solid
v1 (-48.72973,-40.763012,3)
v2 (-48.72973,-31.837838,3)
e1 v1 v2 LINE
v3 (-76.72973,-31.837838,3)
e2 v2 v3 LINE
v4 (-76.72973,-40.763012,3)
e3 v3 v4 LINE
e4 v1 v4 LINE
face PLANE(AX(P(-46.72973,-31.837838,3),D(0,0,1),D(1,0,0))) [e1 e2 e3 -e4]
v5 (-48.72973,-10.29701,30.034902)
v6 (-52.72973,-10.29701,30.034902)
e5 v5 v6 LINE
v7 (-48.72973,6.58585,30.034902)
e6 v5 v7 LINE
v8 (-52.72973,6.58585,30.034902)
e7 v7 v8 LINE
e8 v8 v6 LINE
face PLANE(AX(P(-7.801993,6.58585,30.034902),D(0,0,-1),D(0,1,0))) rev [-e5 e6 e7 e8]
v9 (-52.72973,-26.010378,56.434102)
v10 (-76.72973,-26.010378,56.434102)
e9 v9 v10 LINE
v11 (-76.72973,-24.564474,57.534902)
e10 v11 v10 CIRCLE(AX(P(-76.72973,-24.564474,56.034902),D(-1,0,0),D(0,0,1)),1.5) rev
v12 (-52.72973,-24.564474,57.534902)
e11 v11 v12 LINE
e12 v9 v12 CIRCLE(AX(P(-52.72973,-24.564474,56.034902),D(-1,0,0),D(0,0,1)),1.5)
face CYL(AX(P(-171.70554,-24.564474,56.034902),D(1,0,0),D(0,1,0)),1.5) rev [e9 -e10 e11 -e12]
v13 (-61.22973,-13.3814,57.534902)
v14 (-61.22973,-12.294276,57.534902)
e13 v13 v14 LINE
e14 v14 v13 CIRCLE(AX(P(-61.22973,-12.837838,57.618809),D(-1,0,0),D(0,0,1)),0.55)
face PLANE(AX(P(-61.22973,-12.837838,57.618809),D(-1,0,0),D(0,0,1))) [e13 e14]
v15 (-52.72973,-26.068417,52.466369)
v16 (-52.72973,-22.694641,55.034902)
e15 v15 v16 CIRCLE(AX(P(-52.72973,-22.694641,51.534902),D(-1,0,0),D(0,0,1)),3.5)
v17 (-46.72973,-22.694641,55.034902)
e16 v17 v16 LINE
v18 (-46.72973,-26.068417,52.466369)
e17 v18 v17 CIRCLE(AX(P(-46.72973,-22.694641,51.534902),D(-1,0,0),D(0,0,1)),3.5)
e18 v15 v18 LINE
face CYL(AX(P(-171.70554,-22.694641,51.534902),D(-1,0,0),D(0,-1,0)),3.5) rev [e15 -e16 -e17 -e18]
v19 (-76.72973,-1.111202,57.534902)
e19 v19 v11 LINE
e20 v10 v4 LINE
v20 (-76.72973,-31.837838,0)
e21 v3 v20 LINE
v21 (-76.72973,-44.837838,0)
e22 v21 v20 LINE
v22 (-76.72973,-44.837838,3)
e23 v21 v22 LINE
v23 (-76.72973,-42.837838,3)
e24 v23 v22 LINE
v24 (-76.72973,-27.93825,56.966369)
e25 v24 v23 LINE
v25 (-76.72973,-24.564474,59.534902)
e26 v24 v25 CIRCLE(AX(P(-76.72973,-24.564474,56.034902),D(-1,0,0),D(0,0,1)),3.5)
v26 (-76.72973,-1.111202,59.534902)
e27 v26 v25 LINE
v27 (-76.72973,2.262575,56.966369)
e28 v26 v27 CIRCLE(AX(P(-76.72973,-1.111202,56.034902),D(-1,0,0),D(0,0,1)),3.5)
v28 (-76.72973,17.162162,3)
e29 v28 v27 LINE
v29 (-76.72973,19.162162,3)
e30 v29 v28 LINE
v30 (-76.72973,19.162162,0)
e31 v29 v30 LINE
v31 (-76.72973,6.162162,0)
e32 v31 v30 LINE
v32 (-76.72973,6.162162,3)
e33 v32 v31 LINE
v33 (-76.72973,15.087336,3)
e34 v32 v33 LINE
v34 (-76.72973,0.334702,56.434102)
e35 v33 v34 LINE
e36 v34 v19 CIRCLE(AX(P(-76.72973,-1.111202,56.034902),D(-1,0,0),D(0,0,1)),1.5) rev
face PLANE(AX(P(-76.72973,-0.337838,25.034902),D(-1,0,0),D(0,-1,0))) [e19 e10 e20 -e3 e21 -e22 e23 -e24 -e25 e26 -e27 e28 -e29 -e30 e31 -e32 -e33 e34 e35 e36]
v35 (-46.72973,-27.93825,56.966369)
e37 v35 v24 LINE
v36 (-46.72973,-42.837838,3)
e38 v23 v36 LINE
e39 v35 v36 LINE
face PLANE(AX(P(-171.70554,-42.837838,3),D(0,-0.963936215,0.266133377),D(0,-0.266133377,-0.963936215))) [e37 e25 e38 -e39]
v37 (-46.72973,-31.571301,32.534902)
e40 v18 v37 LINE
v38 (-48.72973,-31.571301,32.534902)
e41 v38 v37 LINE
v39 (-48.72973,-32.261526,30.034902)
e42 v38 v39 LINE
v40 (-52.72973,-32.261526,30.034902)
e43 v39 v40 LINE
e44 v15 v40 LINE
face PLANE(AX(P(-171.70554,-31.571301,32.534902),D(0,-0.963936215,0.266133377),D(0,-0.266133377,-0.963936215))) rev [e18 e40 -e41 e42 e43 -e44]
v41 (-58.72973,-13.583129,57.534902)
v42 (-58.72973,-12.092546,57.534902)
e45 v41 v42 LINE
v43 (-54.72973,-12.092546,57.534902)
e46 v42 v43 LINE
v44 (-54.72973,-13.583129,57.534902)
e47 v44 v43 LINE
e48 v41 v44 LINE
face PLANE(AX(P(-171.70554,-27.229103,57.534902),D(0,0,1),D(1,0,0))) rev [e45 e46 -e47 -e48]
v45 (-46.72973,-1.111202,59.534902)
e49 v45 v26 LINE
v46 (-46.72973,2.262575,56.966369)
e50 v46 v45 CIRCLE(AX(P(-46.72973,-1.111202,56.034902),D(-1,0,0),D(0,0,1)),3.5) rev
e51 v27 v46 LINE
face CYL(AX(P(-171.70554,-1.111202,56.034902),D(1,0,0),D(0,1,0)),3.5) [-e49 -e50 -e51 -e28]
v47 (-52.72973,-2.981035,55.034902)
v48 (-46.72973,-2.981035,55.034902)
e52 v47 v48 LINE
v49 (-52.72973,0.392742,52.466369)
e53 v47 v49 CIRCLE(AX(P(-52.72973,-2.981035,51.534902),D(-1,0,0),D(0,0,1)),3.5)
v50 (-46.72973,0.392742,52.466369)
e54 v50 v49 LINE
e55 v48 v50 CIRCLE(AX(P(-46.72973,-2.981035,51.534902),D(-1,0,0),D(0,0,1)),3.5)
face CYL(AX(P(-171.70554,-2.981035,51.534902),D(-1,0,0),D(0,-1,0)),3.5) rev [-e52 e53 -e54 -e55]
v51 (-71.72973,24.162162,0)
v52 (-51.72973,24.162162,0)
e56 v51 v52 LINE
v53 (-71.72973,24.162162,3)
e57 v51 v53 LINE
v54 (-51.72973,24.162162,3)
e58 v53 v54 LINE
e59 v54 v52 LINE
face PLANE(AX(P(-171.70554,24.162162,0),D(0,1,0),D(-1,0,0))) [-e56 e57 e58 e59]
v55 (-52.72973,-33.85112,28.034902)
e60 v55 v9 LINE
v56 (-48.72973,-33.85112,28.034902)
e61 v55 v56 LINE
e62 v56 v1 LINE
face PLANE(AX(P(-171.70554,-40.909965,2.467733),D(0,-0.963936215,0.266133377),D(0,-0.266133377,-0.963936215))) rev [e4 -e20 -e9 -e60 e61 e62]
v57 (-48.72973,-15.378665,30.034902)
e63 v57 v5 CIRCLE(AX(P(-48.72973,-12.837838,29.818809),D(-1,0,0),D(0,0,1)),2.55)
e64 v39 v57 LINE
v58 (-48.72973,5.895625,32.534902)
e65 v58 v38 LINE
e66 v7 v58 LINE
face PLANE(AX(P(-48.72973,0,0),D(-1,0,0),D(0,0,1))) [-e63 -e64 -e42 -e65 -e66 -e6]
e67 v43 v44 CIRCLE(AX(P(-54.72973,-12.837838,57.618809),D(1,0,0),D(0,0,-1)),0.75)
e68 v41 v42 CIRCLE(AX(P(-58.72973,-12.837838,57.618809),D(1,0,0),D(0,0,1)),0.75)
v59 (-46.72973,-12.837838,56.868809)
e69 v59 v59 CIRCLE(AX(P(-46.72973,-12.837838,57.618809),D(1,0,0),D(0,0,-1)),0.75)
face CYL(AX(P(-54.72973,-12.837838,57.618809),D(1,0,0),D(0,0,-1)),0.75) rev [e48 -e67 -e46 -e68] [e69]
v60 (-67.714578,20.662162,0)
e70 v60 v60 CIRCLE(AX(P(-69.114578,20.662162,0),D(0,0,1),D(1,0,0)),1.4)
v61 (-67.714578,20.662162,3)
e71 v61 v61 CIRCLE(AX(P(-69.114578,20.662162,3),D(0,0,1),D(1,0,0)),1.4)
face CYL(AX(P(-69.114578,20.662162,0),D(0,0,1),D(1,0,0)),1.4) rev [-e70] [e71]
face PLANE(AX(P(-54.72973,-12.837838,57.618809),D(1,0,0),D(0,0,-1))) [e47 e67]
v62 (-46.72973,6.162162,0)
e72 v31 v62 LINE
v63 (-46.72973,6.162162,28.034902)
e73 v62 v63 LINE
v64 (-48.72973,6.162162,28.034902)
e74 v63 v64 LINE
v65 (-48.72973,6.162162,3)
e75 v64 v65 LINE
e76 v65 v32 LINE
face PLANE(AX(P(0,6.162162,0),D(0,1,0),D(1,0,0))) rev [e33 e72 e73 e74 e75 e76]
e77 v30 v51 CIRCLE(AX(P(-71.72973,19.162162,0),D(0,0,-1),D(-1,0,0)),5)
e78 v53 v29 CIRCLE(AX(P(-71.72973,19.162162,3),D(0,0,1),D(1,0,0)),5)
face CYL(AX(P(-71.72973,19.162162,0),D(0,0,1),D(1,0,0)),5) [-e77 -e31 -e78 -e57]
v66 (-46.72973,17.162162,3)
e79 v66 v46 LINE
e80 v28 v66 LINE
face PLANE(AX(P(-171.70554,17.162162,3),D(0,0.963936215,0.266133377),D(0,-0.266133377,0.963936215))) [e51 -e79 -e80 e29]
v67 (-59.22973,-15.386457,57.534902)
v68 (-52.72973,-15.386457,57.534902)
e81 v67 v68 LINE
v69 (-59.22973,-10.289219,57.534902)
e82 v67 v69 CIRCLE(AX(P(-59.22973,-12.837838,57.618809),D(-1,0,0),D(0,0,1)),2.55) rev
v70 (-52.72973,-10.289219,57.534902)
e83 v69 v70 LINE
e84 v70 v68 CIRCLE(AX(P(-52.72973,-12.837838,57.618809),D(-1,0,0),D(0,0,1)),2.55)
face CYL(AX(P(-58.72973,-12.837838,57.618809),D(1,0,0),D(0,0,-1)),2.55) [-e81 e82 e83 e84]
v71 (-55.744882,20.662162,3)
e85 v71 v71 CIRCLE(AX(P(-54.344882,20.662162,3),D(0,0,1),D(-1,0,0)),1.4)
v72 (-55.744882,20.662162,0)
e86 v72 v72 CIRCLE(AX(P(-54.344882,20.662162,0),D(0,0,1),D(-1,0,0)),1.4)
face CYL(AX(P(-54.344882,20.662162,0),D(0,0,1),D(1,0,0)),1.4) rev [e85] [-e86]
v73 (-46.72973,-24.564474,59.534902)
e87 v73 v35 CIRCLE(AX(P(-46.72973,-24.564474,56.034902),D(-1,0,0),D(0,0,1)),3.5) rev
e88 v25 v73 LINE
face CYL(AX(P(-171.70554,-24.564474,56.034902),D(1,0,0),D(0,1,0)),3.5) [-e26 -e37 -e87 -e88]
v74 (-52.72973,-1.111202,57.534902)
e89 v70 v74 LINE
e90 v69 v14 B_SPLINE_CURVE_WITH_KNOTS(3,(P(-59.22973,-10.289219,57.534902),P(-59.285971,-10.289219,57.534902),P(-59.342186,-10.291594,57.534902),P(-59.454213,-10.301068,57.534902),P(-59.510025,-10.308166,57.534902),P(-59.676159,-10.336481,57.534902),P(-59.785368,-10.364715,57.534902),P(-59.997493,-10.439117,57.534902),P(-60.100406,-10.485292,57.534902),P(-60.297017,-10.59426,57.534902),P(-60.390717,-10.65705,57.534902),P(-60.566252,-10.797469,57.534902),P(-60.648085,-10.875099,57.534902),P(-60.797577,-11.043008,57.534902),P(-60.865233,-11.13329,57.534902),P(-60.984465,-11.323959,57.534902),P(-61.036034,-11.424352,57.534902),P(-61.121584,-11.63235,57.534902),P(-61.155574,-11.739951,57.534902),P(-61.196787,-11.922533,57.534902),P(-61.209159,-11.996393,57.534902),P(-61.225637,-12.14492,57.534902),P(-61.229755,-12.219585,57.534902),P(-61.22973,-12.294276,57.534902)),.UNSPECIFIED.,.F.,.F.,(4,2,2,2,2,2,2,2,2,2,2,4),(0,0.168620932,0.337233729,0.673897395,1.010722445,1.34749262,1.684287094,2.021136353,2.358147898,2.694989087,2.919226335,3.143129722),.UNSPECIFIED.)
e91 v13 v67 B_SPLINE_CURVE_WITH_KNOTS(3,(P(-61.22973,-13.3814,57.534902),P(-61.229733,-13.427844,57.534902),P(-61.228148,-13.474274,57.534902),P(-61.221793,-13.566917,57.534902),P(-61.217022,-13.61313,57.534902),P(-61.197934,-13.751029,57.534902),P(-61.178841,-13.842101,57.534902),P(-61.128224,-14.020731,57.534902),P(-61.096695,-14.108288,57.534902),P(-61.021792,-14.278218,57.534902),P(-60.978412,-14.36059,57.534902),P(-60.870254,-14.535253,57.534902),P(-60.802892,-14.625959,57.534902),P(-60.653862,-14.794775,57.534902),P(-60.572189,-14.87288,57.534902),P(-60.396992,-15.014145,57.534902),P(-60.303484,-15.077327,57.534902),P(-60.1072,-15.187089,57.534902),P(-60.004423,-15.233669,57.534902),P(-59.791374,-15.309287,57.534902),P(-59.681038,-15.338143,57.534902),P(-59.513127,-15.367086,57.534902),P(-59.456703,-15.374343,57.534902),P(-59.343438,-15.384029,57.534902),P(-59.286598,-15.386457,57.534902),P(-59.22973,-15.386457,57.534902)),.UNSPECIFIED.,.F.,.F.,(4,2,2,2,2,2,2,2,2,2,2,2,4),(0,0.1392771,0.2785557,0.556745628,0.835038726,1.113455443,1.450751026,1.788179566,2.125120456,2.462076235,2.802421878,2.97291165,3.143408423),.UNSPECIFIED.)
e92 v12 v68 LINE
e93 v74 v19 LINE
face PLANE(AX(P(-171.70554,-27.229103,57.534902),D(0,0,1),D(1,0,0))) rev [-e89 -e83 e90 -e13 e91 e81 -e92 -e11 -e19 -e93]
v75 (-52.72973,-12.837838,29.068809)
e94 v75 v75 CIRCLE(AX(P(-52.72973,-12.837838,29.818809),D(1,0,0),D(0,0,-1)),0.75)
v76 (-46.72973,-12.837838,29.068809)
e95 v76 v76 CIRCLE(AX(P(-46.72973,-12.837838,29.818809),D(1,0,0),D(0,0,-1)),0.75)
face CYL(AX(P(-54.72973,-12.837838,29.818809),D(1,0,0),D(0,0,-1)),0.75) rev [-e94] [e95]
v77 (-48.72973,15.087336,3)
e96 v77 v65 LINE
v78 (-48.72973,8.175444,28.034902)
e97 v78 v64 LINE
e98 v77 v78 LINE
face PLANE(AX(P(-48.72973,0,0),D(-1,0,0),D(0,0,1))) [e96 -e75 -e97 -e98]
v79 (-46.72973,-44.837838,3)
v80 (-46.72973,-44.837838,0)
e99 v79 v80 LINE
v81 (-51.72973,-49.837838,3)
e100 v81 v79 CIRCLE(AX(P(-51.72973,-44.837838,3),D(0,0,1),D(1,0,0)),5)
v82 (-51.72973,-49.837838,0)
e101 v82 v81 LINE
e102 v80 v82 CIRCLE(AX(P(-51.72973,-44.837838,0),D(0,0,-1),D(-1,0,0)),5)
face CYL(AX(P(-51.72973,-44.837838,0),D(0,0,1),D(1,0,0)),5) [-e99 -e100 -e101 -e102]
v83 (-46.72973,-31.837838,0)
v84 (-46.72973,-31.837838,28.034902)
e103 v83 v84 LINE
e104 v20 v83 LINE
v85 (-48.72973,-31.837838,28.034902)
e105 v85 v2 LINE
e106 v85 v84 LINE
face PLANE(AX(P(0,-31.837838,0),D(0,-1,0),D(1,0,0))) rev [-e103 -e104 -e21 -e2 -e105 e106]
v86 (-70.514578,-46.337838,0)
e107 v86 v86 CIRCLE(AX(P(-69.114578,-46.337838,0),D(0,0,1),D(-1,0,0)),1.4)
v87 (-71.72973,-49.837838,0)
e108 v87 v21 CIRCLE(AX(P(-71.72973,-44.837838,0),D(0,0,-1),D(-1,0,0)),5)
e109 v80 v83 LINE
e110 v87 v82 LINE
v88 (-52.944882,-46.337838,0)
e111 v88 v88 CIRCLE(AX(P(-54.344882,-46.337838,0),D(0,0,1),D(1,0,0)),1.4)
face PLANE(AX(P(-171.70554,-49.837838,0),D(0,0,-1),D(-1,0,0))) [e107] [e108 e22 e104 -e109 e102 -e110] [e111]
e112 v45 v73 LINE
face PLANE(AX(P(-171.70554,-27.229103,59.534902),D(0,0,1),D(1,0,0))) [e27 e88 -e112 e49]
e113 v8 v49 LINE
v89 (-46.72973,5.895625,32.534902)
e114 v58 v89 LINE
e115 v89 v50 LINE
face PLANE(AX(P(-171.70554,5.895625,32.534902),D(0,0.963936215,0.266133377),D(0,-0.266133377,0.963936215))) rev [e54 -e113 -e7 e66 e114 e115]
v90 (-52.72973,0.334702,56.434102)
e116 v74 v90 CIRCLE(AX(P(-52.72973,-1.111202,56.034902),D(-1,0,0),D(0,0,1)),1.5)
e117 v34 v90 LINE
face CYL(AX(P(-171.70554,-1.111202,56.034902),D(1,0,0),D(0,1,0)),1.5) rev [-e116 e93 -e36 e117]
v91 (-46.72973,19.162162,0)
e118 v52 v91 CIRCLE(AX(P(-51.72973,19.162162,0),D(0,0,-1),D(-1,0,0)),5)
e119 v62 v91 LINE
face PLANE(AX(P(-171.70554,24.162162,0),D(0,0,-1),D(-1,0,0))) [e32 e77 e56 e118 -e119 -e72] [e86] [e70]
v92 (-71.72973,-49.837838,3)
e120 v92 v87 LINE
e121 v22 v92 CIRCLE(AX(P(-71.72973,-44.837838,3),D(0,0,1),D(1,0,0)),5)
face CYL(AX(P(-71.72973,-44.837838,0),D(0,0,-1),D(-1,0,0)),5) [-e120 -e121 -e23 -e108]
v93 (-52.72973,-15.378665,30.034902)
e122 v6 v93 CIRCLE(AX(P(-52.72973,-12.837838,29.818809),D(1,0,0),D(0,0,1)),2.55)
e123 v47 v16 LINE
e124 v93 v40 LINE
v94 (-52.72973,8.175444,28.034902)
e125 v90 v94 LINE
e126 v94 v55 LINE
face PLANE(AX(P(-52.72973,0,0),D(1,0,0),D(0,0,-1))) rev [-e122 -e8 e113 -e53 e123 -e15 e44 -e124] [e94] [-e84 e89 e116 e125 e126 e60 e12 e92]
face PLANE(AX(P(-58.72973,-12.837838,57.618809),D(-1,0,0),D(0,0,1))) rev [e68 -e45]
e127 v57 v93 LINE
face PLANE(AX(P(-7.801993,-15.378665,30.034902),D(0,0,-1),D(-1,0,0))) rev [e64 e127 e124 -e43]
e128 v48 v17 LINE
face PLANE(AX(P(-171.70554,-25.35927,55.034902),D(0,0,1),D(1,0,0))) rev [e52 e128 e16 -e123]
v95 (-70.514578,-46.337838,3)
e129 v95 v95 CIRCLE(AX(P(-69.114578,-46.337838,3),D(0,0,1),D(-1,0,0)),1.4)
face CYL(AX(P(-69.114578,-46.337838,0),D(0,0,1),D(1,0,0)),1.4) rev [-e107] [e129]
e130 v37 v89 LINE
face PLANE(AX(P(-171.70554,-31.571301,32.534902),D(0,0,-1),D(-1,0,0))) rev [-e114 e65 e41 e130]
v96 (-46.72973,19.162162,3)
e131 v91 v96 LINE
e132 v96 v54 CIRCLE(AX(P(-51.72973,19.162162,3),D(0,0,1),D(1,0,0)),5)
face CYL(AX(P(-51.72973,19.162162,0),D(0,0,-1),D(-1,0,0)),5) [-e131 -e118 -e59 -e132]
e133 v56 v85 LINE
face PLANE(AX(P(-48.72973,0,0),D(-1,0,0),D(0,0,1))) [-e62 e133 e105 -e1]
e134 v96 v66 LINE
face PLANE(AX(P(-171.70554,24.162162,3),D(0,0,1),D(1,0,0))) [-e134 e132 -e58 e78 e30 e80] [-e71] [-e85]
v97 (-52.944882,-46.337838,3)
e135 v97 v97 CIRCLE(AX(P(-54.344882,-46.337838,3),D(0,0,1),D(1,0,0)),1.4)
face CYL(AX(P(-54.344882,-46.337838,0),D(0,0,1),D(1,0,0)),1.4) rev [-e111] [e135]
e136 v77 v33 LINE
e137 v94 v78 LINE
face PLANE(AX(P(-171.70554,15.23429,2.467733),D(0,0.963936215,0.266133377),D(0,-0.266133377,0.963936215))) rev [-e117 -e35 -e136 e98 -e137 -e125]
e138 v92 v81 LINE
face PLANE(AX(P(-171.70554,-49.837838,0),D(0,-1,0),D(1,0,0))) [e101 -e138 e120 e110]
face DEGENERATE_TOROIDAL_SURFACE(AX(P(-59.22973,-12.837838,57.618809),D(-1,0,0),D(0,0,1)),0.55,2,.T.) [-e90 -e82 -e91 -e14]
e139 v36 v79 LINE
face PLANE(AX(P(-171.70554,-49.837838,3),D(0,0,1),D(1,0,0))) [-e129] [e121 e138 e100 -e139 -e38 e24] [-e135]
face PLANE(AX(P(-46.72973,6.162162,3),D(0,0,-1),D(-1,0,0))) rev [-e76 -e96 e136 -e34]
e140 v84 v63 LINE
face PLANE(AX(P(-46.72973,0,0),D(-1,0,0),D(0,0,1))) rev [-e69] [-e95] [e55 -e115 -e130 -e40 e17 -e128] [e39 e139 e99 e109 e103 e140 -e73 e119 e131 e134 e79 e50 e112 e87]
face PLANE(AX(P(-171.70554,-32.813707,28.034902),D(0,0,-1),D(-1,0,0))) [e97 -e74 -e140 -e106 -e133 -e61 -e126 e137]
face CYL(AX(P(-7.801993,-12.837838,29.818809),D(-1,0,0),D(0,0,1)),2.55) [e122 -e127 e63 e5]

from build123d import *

# Parameters (mm, degrees)
BOSS_EXTRU_1_DEPTH      = 30
CONG_5_R                = 3.5
ESQUISSE3_R             = 1.5
ENL_V_MAT_EXTRU_1_DEPTH = 108.552111318
COQUE5_START            = -74.72972973
COQUE5_DEPTH            = 26
BOSS_EXTRU_5_DEPTH      = 4
BOSS_EXTRU_6_START      = 4
BOSS_EXTRU_6_DEPTH      = 4
ENL_V_START             = -2
ENL_V_MAT_EXTRU_5_DEPTH = 2
ESQUISSE11_W            = 30
ESQUISSE11_H            = 3
BOSS_EXTRU_8_DEPTH      = 18
NERVURE1_REACH          = 85.236
ESQUISSE12_WALL_W       = 25.034902344
ESQUISSE12_WALL_H       = 2
ESQUISSE13_R            = 0.75
ENL_V_MAT_EXTRU_6_DEPTH = 8
BOSS_EXTRU_9_DEPTH      = 6
BOSS_EXTRU_10_DEPTH     = 2.5
CONG_7_R                = 2
ENL_V_MAT_EXTRU_7_DEPTH = 4
CONG_9_R                = 5
ESQUISSE22_R            = 1.4
ENL_V_MAT_EXTRU_8_DEPTH = 108.552111389


# Read off the part's stored shape, not the designer's step: Coque5
with BuildPart() as part:
    # Esquisse2 → Boss.-Extru.1 (new body)
    with BuildSketch(Plane(origin=(-46.72972973, 0, -4), x_dir=(0, 1, 0), z_dir=(1, 0, 0))):
        Polygon((-49.837837838, 4), (-40.553869421, 4), (-32.813706623, 32.034902345), (7.138030947, 32.034902345), (14.878193746, 4), (24.162162162, 4), (24.162162162, 7), (17.162162162, 7), (1.553427739, 63.534902), (-27.229103415, 63.534902), (-42.837837838, 7), (-49.837837838, 7), align=None)
        Polygon((-31.571300562, 36.534902345), (5.895624886, 36.534902345), (-0.316405324, 59.034902), (-25.359270352, 59.034902), align=None, mode=Mode.SUBTRACT)
    extrude(amount=-BOSS_EXTRU_1_DEPTH)

    # Congé5
    cong_5_edges = [part.edges().sort_by_distance(p)[0] for p in [
        (-61.72972973, -27.229103415, 59.534902),
        (-61.72972973, 1.553427739, 59.534902),
        (-61.72972973, -25.359270352, 55.034902),
        (-61.72972973, -0.316405324, 55.034902),
    ]]
    fillet(cong_5_edges, radius=CONG_5_R)

    # Esquisse3 → Enlèv. mat.-Extru.1 (cut, through all)
    with BuildSketch(Plane.XY.offset(3)):
        with Locations((-69.22972973, 20.662162162)):
            Circle(ESQUISSE3_R)
        with Locations(Location((-54.22972973, 20.662162162, 0), (0, 0, 180))):
            Circle(ESQUISSE3_R)
        with Locations((-54.22972973, -46.337837838)):
            Circle(ESQUISSE3_R)
        with Locations(Location((-69.22972973, -46.337837838, 0), (0, 0, 180))):
            Circle(ESQUISSE3_R)
    extrude(amount=-ENL_V_MAT_EXTRU_1_DEPTH, mode=Mode.SUBTRACT)

    # Coque5 outline → Coque5 (cut)
    with BuildSketch(Plane.YZ.offset(COQUE5_START)):
        with BuildLine():
            Line((-26.010377917, 56.434102065), (-41.039101991, 2))
            Line((-41.039101991, 2), (-40.00168895, 2))
            Line((-40.00168895, 2), (-32.813706623, 28.034902345))
            Line((-32.813706623, 28.034902345), (7.138030947, 28.034902345))
            Line((7.138030947, 28.034902345), (14.326013274, 2))
            Line((14.326013274, 2), (15.363426315, 2))
            Line((15.363426315, 2), (0.334702242, 56.434102065))
            ThreePointArc((0.334702242, 56.434102065), (-0.202576772, 57.22838432), (-1.11120208, 57.534902))
            Line((-1.11120208, 57.534902), (-24.564473595, 57.534902))
            ThreePointArc((-24.564473595, 57.534902), (-25.473098904, 57.22838432), (-26.010377917, 56.434102065))
        make_face()
        with BuildLine():
            Line((-31.571300562, 32.534902345), (-26.068417283, 52.466368819))
            ThreePointArc((-26.068417283, 52.466368819), (-24.814766252, 54.319694081), (-22.694640532, 55.034902))
            Line((-22.694640532, 55.034902), (-2.981035143, 55.034902))
            ThreePointArc((-2.981035143, 55.034902), (-0.860909424, 54.319694081), (0.392741608, 52.466368819))
            Line((0.392741608, 52.466368819), (5.895624886, 32.534902345))
            Line((5.895624886, 32.534902345), (-31.571300562, 32.534902345))
        make_face(mode=Mode.SUBTRACT)
    extrude(amount=COQUE5_DEPTH, mode=Mode.SUBTRACT)

    # Esquisse6 → Boss.-Extru.5 (add)
    with BuildSketch(Plane.ZY.offset(48.72972973)):
        Polygon((32.534902345, -32.608713603), (28.034902345, -33.851119664), (28.034902345, 8.175443988), (32.534902345, 6.933037927), align=None)
    extrude(amount=BOSS_EXTRU_5_DEPTH)

    # Esquisse7 → Boss.-Extru.6 (add)
    with BuildSketch(Plane.ZY.offset(48.72972973).offset(BOSS_EXTRU_6_START)):
        with BuildLine():
            Line((57.534902, -24.564473595), (57.534902, -1.11120208))
            ThreePointArc((57.534902, -1.11120208), (57.22838432, -0.202576772), (56.434102065, 0.334702242))
            Line((56.434102065, 0.334702242), (32.534902345, 6.933037927))
            Line((32.534902345, 6.933037927), (32.534902345, 5.895624886))
            Line((32.534902345, 5.895624886), (52.466368819, 0.392741608))
            ThreePointArc((52.466368819, 0.392741608), (54.319694081, -0.860909424), (55.034902, -2.981035143))
            Line((55.034902, -2.981035143), (55.034902, -22.694640532))
            ThreePointArc((55.034902, -22.694640532), (54.319694081, -24.814766252), (52.466368819, -26.068417283))
            Line((52.466368819, -26.068417283), (32.534902345, -31.571300562))
            Line((32.534902345, -31.571300562), (32.534902345, -32.608713603))
            Line((32.534902345, -32.608713603), (56.434102065, -26.010377917))
            ThreePointArc((56.434102065, -26.010377917), (57.22838432, -25.473098904), (57.534902, -24.564473595))
        make_face()
    extrude(amount=-BOSS_EXTRU_6_DEPTH)

    # Esquisse9 → Enlèv. mat.-Extru.5 (cut)
    with BuildSketch(Plane(origin=(-74.72972973, 0, 0), x_dir=(0, 0, -1), z_dir=(1, 0, 0)).offset(ENL_V_START)):
        with BuildLine():
            Line((-2, 15.363426315), (-56.434102065, 0.334702242))
            ThreePointArc((-56.434102065, 0.334702242), (-57.22838432, -0.202576772), (-57.534902, -1.11120208))
            Line((-57.534902, -1.11120208), (-57.534902, -24.564473595))
            ThreePointArc((-57.534902, -24.564473595), (-57.22838432, -25.473098904), (-56.434102065, -26.010377917))
            Line((-56.434102065, -26.010377917), (-2, -41.039101991))
            Line((-2, -41.039101991), (-2, -40.00168895))
            Line((-2, -40.00168895), (-28.034902345, -32.813706623))
            Line((-28.034902345, -32.813706623), (-28.034902345, 7.138030947))
            Line((-28.034902345, 7.138030947), (-2, 14.326013274))
            Line((-2, 14.326013274), (-2, 15.363426315))
        make_face()
    extrude(amount=ENL_V_MAT_EXTRU_5_DEPTH, mode=Mode.SUBTRACT)

    # Esquisse11 → Boss.-Extru.8 (add)
    with BuildSketch(Plane.XZ.offset(49.837837838)):
        with Locations((-61.72972973, 1.5)):
            Rectangle(ESQUISSE11_W, ESQUISSE11_H)
    boss_extru_8 = extrude(amount=-BOSS_EXTRU_8_DEPTH)

    # Esquisse12 wall → Nervure1 (add, up to next)
    with BuildSketch(Plane(origin=(-46.72972973, -31.837837838, 15.517451172), x_dir=(0, 0, -1), z_dir=(0, 1, 0)), mode=Mode.PRIVATE) as nervure1_sk1:
        with Locations((0, 1)):
            Rectangle(ESQUISSE12_WALL_W, ESQUISSE12_WALL_H)
    nervure1_tool1 = extrude(nervure1_sk1.sketch, amount=-NERVURE1_REACH, mode=Mode.PRIVATE) - part.part
    nervure1 = nervure1_tool1.solids().sort_by_distance((-46.72972973, -31.837837838, 15.517451172))[0]
    add(nervure1)

    # Symétrie1: Boss.-Extru.8, Nervure1 across plane
    add(boss_extru_8.mirror(Plane.ZX.offset(-12.837837838)))
    add(nervure1.mirror(Plane.ZX.offset(-12.837837838)))

    # Esquisse13 → Enlèv. mat.-Extru.6 (cut)
    with BuildSketch(Plane(origin=(-46.72972973, 0, 0), x_dir=(0, 0, -1), z_dir=(1, 0, 0))):
        with Locations((-57.618809014, -12.837837838)):
            Circle(ESQUISSE13_R)
        with Locations((-29.818809014, -12.837837838)):
            Circle(ESQUISSE13_R)
    extrude(amount=-ENL_V_MAT_EXTRU_6_DEPTH, mode=Mode.SUBTRACT)

    # Esquisse15 → Boss.-Extru.9 (add)
    with BuildSketch(Plane.ZY.offset(52.72972973)):
        with BuildLine():
            Line((57.534902, -15.386456996), (57.534902, -13.583129467))
            ThreePointArc((57.534902, -13.583129467), (56.868809014, -12.837837838), (57.534902, -12.092546208))
            Line((57.534902, -12.092546208), (57.534902, -10.28921868))
            ThreePointArc((57.534902, -10.28921868), (55.068809014, -12.837837838), (57.534902, -15.386456996))
        make_face()
    extrude(amount=BOSS_EXTRU_9_DEPTH)

    # Esquisse16 → Boss.-Extru.10 (add)
    with BuildSketch(Plane.ZY.offset(58.72972973)):
        with BuildLine():
            Line((57.534902, -15.386456996), (57.534902, -10.28921868))
            ThreePointArc((57.534902, -10.28921868), (55.068809014, -12.837837838), (57.534902, -15.386456996))
        make_face()
    extrude(amount=BOSS_EXTRU_10_DEPTH)

    # Congé7
    cong_7_edges = [part.edges().sort_by_distance(p)[0] for p in [
        (-61.22972973, -12.837837838, 55.068809014),
    ]]
    fillet(cong_7_edges, radius=CONG_7_R)

    # Esquisse17 → Enlèv. mat.-Extru.7 (cut)
    with BuildSketch(Plane.ZY.offset(52.72972973)):
        with BuildLine():
            Line((30.034902345, 6.585850475), (32.534902345, 5.895624886))
            Line((32.534902345, 5.895624886), (32.534902345, -31.571300562))
            Line((32.534902345, -31.571300562), (30.034902345, -32.261526151))
            Line((30.034902345, -32.261526151), (30.034902345, -15.378665198))
            ThreePointArc((30.034902345, -15.378665198), (32.368809014, -12.837837838), (30.034902345, -10.297010478))
            Line((30.034902345, -10.297010478), (30.034902345, 6.585850475))
        make_face()
    extrude(amount=-ENL_V_MAT_EXTRU_7_DEPTH, mode=Mode.SUBTRACT)

    # Congé9
    cong_9_edges = [part.edges().sort_by_distance(p)[0] for p in [
        (-76.72972973, -49.837837838, 1.5),
        (-76.72972973, 24.162162162, 1.5),
        (-46.72972973, 24.162162162, 1.5),
        (-46.72972973, -49.837837838, 1.5),
    ]]
    fillet(cong_9_edges, radius=CONG_9_R)

    # Esquisse22 → Enlèv. mat.-Extru.8 (cut, through all)
    with BuildSketch(Plane.XY.offset(3)):
        with Locations((-69.114577733, 20.662162162)):
            Circle(ESQUISSE22_R)
        with Locations(Location((-54.344881726, 20.662162162, 0), (0, 0, 180))):
            Circle(ESQUISSE22_R)
        with Locations((-54.344881726, -46.337837838)):
            Circle(ESQUISSE22_R)
        with Locations(Location((-69.114577733, -46.337837838, 0), (0, 0, 180))):
            Circle(ESQUISSE22_R)
    extrude(amount=-ENL_V_MAT_EXTRU_8_DEPTH, mode=Mode.SUBTRACT)


solid = part.part
